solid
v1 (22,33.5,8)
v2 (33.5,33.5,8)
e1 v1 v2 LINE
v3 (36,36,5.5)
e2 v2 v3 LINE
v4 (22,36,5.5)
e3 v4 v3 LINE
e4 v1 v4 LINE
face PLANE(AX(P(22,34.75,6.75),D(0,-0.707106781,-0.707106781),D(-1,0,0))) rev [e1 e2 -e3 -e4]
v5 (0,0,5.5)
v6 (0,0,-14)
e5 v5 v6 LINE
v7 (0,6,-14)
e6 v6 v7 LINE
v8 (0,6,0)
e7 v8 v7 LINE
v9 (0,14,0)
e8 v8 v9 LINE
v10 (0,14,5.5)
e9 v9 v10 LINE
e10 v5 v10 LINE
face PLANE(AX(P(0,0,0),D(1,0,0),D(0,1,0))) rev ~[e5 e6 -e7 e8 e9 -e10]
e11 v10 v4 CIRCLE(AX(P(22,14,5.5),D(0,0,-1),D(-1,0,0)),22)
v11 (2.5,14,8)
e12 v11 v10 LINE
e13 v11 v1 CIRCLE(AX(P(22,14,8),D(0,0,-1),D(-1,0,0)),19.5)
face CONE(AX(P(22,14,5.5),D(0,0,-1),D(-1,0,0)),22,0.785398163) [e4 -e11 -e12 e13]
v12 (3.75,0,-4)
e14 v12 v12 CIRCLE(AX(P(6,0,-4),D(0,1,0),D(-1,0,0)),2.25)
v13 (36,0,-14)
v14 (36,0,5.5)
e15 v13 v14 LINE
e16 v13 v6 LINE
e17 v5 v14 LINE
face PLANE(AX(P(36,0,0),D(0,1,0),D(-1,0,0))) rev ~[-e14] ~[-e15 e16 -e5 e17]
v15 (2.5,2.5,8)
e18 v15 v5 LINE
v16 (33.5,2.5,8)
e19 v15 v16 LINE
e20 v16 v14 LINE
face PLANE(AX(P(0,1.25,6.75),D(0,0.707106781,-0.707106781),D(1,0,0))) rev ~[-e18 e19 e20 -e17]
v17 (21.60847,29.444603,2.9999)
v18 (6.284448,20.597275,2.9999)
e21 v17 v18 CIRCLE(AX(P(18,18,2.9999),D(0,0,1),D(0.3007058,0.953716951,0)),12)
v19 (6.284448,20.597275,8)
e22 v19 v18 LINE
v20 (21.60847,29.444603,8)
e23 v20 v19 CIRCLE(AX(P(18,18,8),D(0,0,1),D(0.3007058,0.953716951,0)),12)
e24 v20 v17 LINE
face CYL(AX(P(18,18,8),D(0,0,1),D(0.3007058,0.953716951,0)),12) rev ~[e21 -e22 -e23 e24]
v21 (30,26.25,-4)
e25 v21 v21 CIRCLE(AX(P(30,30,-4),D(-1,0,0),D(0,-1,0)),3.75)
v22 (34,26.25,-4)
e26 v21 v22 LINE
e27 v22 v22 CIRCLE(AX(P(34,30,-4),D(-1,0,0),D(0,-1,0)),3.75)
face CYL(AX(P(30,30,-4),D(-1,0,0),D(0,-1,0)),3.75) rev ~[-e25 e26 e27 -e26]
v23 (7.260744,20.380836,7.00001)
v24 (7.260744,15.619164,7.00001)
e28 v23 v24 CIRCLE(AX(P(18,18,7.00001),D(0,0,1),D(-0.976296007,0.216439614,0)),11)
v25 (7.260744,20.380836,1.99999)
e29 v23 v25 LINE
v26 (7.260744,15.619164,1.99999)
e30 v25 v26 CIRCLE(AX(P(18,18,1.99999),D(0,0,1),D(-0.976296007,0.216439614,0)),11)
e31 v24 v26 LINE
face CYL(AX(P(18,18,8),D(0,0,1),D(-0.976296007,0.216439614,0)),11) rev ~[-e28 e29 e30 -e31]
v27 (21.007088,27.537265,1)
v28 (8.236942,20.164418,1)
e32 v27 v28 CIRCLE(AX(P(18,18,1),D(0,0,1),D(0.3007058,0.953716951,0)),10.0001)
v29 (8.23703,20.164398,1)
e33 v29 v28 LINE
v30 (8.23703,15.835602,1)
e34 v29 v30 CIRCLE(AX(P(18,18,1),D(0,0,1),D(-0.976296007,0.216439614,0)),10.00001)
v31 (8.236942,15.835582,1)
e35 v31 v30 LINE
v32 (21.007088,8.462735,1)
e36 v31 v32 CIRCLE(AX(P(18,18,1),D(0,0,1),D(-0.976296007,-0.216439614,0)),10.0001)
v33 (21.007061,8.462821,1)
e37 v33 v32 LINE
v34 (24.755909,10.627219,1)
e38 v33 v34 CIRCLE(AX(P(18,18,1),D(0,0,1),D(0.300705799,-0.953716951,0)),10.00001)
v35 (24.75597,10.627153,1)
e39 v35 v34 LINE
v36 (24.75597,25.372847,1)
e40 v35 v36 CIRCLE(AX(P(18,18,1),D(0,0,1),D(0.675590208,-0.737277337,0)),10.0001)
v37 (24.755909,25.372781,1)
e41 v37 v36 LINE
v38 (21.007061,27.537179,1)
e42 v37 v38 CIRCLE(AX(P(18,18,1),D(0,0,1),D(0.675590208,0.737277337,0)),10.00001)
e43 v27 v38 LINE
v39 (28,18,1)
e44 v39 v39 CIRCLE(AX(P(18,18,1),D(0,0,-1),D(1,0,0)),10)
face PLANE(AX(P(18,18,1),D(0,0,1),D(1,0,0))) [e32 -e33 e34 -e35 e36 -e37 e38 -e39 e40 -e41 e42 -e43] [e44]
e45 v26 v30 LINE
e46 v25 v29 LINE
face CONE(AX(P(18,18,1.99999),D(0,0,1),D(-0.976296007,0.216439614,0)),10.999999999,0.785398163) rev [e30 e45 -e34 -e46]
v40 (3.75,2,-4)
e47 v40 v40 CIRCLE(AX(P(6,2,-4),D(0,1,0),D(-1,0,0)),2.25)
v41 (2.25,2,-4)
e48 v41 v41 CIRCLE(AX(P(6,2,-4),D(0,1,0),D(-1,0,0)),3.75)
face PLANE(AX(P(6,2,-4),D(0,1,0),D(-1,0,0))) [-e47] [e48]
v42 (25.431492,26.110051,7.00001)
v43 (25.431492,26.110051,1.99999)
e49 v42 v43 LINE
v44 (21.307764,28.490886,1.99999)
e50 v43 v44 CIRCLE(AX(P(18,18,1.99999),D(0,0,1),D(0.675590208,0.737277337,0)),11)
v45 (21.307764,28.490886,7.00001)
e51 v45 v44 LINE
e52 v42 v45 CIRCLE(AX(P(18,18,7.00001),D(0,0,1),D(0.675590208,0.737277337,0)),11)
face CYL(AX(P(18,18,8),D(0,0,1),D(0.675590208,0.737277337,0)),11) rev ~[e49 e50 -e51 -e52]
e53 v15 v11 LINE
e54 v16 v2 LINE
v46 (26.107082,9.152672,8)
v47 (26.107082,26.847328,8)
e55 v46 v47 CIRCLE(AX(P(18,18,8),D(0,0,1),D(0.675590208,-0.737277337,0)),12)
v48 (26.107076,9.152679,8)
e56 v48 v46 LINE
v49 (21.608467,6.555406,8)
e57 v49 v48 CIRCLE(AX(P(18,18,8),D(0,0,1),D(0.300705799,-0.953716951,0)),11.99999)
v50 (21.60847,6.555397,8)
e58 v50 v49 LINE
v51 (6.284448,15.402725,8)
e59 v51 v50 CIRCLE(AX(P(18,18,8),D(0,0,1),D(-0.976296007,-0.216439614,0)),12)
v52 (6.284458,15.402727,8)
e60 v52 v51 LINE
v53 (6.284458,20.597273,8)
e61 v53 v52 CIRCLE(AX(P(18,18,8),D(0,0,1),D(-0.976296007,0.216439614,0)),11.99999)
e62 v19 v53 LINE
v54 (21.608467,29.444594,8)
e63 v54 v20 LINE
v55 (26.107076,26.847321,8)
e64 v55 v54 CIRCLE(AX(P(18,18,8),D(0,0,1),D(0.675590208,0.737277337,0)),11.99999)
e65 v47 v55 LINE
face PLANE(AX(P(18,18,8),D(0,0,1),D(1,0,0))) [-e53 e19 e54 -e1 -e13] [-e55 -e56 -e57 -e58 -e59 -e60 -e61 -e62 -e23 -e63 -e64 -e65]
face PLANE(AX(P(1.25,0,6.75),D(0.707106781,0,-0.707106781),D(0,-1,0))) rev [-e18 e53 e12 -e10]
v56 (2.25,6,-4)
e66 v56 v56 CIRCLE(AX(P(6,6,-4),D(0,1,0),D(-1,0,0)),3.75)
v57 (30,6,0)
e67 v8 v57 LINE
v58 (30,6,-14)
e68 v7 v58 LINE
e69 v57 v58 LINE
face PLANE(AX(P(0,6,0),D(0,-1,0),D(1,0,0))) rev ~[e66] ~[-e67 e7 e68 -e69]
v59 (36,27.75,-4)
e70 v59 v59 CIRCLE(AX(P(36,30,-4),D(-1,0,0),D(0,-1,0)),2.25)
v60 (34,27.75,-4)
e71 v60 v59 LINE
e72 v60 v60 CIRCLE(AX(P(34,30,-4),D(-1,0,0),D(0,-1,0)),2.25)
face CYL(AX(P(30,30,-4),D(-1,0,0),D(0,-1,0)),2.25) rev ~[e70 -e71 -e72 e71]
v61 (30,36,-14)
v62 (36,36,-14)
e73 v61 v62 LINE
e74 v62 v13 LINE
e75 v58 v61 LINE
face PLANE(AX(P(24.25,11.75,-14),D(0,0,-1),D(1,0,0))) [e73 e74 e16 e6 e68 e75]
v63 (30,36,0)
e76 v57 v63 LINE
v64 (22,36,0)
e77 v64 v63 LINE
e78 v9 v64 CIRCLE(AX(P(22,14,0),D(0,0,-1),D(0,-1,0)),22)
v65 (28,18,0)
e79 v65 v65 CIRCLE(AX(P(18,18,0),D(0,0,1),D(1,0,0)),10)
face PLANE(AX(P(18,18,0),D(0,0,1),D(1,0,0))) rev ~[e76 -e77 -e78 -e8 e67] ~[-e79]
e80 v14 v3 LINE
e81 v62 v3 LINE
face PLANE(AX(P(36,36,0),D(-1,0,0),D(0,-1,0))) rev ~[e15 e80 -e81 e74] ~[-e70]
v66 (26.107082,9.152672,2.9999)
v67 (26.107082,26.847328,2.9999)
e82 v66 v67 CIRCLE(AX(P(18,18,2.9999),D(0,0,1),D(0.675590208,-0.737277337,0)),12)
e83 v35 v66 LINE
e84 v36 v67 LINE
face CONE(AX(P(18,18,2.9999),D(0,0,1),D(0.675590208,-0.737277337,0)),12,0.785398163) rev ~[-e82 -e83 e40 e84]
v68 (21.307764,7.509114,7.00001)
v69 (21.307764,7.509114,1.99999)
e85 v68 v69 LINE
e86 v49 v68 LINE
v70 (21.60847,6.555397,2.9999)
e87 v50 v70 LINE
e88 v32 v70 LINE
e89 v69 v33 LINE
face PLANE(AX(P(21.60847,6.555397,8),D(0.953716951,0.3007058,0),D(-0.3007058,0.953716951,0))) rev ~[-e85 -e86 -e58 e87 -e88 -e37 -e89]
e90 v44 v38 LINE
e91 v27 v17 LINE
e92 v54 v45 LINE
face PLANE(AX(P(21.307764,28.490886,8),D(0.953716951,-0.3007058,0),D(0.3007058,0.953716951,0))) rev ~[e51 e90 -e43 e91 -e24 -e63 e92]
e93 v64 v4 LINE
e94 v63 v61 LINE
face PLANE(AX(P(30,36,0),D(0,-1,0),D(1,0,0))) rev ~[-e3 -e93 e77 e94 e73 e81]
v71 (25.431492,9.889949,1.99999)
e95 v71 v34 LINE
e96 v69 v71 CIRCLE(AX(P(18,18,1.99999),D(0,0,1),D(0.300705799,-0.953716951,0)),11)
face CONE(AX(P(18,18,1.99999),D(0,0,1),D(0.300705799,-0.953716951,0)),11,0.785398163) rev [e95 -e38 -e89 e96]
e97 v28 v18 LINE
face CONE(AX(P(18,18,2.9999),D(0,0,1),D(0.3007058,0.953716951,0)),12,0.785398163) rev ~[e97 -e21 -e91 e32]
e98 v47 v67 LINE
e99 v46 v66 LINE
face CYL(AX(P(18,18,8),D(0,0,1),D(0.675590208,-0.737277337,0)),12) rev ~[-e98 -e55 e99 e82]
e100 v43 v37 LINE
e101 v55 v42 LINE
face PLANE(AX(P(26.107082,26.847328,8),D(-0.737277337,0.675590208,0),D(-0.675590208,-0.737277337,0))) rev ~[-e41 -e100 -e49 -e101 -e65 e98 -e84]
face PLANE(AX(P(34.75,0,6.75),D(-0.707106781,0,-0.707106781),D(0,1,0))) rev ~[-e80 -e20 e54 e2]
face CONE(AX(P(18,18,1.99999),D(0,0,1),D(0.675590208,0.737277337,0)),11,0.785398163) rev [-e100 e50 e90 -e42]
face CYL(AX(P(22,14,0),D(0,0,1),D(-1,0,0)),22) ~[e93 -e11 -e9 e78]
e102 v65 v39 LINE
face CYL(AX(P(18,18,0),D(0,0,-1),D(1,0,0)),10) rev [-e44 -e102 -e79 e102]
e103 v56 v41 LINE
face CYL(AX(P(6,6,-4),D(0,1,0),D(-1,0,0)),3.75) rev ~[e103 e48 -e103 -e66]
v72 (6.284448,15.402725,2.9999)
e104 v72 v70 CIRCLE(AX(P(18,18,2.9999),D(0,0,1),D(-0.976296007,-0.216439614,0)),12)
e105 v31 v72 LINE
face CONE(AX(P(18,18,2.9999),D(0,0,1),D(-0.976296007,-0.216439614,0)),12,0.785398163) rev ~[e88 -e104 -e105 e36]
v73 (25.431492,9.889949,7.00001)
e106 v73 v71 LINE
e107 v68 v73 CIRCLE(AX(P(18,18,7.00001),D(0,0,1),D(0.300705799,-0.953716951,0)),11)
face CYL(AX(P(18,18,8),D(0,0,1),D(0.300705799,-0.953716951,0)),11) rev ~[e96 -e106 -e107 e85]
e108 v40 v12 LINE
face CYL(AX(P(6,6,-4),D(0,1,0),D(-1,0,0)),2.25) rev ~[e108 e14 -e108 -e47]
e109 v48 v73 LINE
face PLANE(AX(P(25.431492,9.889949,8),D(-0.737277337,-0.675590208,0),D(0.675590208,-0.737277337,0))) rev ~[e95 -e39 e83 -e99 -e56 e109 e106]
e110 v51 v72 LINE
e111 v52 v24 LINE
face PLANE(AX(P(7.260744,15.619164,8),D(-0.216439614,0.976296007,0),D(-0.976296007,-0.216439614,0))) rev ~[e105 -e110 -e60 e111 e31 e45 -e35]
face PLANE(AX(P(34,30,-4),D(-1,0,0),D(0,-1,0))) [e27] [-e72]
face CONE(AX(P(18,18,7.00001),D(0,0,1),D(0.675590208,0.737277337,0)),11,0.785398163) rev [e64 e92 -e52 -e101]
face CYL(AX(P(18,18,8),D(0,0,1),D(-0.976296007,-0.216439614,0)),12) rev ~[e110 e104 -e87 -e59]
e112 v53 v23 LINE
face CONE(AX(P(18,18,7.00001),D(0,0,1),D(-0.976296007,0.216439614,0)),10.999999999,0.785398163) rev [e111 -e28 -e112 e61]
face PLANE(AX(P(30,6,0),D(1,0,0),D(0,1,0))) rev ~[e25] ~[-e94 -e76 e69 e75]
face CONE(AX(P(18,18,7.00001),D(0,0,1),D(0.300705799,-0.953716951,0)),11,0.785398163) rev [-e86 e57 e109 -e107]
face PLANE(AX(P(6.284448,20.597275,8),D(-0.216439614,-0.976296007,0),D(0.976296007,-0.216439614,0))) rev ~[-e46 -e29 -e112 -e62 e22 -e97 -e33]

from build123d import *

# Parameters (mm, degrees)
F0_W      = 36
F0_H      = 36
F0_R      = 10
F1_DEPTH  = 8
F3_DEPTH  = 14
F4_R      = 2.25
F5_DEPTH  = 6.001
F6_R      = 3.75
F7_DEPTH  = 4
F8_R      = 2.25
F9_DEPTH  = 6.001
F10_R     = 3.75
F11_DEPTH = 4
F13_DEPTH = 7
F14_R     = 22
F15_SIZE  = 2.5
F16_SIZE  = 0.99999
F17_SIZE  = 1.9999


# Not quite as in the source:
# - a fillet or chamfer is up to 0.001 mm smaller than in the source, because OpenCascade refuses the exact size


with BuildPart() as f1:
    # F0 (on Top) → F1 (new body)
    with BuildSketch(Plane.XY):
        with Locations((18, 18)):
            Rectangle(F0_W, F0_H)
        with Locations((18, 18)):
            Circle(F0_R, mode=Mode.SUBTRACT)
    extrude(amount=F1_DEPTH)

    # F2 (on face) → F3 (join)
    with BuildSketch(Plane(origin=(0, 0, 0), x_dir=(1, 0, 0), z_dir=(0, 0, -1))):
        Polygon((36, 0), (0, 0), (0, -6), (30, -6), (30, -36), (36, -36), align=None)
    extrude(amount=F3_DEPTH)

    # F4 (on face) → F5 (cut, through all)
    with BuildSketch(Plane(origin=(0, 6, 0), x_dir=(-1, 0, 0), z_dir=(0, 1, 0))):
        with Locations((-6, -4)):
            Circle(F4_R)
    extrude(amount=-F5_DEPTH, mode=Mode.SUBTRACT)

    # F6 (on face) → F7 (cut)
    with BuildSketch(Plane(origin=(0, 6, 0), x_dir=(-1, 0, 0), z_dir=(0, 1, 0))):
        with Locations((-6, -4)):
            Circle(F6_R)
    extrude(amount=-F7_DEPTH, mode=Mode.SUBTRACT)

    # F8 (on face) → F9 (cut, through all)
    with BuildSketch(Plane(origin=(30, 0, 0), x_dir=(0, -1, 0), z_dir=(-1, 0, 0))):
        with Locations((-30, -4)):
            Circle(F8_R)
    extrude(amount=-F9_DEPTH, mode=Mode.SUBTRACT)

    # F10 (on face) → F11 (cut)
    with BuildSketch(Plane(origin=(30, 0, 0), x_dir=(0, -1, 0), z_dir=(-1, 0, 0))):
        with Locations((-30, -4)):
            Circle(F10_R)
    extrude(amount=-F11_DEPTH, mode=Mode.SUBTRACT)

    # F12 (on face) → F13 (cut)
    with BuildSketch(Plane.XY.offset(8)):
        with BuildLine():
            Line((21.3077637945, 28.4908864582), (21.6084695941, 29.444603409))
            ThreePointArc((21.6084695941, 29.444603409), (12, 28.3923048454), (6.2844479146, 20.5972753673))
            Line((6.2844479146, 20.5972753673), (7.2607439217, 20.3808357533))
            ThreePointArc((7.2607439217, 20.3808357533), (7, 18), (7.2607439217, 15.6191642467))
            Line((7.2607439217, 15.6191642467), (6.2844479146, 15.4027246327))
            ThreePointArc((6.2844479146, 15.4027246327), (12, 7.6076951546), (21.6084695941, 6.555396591))
            Line((21.6084695941, 6.555396591), (21.3077637945, 7.5091135418))
            ThreePointArc((21.3077637945, 7.5091135418), (23.5, 8.4737205584), (25.4314922838, 9.8899492951))
            Line((25.4314922838, 9.8899492951), (26.1070824914, 9.1526719583))
            ThreePointArc((26.1070824914, 9.1526719583), (30, 18), (26.1070824914, 26.8473280417))
            Line((26.1070824914, 26.8473280417), (25.4314922838, 26.1100507049))
            ThreePointArc((25.4314922838, 26.1100507049), (23.5, 27.5262794416), (21.3077637945, 28.4908864582))
        make_face()
    extrude(amount=-F13_DEPTH, mode=Mode.SUBTRACT)

    # F14
    f14_edges = [f1.edges().sort_by_distance(p)[0] for p in [
        (0, 36, 4),
    ]]
    fillet(f14_edges, radius=F14_R)

    # F15
    f15_edges = [f1.edges().sort_by_distance(p)[0] for p in [
        (36, 18, 8),
        (18, 0, 8),
        (29, 36, 8),
        (0, 7, 8),
    ]]
    chamfer(f15_edges, length=F15_SIZE)

    # F16 (size 1 in the source; OpenCascade refuses exactly that, so slightly less here)
    f16_edges = [f1.edges().sort_by_distance(p)[0] for p in [
        (23.5, 8.473721, 1),
        (7, 18, 1),
        (23.5, 27.526279, 1),
        (7, 18, 8),
        (23.5, 27.526279, 8),
        (23.5, 8.473721, 8),
    ]]
    chamfer(f16_edges, length=F16_SIZE)

    # F17 (size 2 in the source; OpenCascade refuses exactly that, so slightly less here)
    f17_edges = [f1.edges().sort_by_distance(p)[0] for p in [
        (30, 18, 1),
        (12, 7.607695, 1),
        (12, 28.392305, 1),
    ]]
    chamfer(f17_edges, length=F17_SIZE)


solid = f1.part
